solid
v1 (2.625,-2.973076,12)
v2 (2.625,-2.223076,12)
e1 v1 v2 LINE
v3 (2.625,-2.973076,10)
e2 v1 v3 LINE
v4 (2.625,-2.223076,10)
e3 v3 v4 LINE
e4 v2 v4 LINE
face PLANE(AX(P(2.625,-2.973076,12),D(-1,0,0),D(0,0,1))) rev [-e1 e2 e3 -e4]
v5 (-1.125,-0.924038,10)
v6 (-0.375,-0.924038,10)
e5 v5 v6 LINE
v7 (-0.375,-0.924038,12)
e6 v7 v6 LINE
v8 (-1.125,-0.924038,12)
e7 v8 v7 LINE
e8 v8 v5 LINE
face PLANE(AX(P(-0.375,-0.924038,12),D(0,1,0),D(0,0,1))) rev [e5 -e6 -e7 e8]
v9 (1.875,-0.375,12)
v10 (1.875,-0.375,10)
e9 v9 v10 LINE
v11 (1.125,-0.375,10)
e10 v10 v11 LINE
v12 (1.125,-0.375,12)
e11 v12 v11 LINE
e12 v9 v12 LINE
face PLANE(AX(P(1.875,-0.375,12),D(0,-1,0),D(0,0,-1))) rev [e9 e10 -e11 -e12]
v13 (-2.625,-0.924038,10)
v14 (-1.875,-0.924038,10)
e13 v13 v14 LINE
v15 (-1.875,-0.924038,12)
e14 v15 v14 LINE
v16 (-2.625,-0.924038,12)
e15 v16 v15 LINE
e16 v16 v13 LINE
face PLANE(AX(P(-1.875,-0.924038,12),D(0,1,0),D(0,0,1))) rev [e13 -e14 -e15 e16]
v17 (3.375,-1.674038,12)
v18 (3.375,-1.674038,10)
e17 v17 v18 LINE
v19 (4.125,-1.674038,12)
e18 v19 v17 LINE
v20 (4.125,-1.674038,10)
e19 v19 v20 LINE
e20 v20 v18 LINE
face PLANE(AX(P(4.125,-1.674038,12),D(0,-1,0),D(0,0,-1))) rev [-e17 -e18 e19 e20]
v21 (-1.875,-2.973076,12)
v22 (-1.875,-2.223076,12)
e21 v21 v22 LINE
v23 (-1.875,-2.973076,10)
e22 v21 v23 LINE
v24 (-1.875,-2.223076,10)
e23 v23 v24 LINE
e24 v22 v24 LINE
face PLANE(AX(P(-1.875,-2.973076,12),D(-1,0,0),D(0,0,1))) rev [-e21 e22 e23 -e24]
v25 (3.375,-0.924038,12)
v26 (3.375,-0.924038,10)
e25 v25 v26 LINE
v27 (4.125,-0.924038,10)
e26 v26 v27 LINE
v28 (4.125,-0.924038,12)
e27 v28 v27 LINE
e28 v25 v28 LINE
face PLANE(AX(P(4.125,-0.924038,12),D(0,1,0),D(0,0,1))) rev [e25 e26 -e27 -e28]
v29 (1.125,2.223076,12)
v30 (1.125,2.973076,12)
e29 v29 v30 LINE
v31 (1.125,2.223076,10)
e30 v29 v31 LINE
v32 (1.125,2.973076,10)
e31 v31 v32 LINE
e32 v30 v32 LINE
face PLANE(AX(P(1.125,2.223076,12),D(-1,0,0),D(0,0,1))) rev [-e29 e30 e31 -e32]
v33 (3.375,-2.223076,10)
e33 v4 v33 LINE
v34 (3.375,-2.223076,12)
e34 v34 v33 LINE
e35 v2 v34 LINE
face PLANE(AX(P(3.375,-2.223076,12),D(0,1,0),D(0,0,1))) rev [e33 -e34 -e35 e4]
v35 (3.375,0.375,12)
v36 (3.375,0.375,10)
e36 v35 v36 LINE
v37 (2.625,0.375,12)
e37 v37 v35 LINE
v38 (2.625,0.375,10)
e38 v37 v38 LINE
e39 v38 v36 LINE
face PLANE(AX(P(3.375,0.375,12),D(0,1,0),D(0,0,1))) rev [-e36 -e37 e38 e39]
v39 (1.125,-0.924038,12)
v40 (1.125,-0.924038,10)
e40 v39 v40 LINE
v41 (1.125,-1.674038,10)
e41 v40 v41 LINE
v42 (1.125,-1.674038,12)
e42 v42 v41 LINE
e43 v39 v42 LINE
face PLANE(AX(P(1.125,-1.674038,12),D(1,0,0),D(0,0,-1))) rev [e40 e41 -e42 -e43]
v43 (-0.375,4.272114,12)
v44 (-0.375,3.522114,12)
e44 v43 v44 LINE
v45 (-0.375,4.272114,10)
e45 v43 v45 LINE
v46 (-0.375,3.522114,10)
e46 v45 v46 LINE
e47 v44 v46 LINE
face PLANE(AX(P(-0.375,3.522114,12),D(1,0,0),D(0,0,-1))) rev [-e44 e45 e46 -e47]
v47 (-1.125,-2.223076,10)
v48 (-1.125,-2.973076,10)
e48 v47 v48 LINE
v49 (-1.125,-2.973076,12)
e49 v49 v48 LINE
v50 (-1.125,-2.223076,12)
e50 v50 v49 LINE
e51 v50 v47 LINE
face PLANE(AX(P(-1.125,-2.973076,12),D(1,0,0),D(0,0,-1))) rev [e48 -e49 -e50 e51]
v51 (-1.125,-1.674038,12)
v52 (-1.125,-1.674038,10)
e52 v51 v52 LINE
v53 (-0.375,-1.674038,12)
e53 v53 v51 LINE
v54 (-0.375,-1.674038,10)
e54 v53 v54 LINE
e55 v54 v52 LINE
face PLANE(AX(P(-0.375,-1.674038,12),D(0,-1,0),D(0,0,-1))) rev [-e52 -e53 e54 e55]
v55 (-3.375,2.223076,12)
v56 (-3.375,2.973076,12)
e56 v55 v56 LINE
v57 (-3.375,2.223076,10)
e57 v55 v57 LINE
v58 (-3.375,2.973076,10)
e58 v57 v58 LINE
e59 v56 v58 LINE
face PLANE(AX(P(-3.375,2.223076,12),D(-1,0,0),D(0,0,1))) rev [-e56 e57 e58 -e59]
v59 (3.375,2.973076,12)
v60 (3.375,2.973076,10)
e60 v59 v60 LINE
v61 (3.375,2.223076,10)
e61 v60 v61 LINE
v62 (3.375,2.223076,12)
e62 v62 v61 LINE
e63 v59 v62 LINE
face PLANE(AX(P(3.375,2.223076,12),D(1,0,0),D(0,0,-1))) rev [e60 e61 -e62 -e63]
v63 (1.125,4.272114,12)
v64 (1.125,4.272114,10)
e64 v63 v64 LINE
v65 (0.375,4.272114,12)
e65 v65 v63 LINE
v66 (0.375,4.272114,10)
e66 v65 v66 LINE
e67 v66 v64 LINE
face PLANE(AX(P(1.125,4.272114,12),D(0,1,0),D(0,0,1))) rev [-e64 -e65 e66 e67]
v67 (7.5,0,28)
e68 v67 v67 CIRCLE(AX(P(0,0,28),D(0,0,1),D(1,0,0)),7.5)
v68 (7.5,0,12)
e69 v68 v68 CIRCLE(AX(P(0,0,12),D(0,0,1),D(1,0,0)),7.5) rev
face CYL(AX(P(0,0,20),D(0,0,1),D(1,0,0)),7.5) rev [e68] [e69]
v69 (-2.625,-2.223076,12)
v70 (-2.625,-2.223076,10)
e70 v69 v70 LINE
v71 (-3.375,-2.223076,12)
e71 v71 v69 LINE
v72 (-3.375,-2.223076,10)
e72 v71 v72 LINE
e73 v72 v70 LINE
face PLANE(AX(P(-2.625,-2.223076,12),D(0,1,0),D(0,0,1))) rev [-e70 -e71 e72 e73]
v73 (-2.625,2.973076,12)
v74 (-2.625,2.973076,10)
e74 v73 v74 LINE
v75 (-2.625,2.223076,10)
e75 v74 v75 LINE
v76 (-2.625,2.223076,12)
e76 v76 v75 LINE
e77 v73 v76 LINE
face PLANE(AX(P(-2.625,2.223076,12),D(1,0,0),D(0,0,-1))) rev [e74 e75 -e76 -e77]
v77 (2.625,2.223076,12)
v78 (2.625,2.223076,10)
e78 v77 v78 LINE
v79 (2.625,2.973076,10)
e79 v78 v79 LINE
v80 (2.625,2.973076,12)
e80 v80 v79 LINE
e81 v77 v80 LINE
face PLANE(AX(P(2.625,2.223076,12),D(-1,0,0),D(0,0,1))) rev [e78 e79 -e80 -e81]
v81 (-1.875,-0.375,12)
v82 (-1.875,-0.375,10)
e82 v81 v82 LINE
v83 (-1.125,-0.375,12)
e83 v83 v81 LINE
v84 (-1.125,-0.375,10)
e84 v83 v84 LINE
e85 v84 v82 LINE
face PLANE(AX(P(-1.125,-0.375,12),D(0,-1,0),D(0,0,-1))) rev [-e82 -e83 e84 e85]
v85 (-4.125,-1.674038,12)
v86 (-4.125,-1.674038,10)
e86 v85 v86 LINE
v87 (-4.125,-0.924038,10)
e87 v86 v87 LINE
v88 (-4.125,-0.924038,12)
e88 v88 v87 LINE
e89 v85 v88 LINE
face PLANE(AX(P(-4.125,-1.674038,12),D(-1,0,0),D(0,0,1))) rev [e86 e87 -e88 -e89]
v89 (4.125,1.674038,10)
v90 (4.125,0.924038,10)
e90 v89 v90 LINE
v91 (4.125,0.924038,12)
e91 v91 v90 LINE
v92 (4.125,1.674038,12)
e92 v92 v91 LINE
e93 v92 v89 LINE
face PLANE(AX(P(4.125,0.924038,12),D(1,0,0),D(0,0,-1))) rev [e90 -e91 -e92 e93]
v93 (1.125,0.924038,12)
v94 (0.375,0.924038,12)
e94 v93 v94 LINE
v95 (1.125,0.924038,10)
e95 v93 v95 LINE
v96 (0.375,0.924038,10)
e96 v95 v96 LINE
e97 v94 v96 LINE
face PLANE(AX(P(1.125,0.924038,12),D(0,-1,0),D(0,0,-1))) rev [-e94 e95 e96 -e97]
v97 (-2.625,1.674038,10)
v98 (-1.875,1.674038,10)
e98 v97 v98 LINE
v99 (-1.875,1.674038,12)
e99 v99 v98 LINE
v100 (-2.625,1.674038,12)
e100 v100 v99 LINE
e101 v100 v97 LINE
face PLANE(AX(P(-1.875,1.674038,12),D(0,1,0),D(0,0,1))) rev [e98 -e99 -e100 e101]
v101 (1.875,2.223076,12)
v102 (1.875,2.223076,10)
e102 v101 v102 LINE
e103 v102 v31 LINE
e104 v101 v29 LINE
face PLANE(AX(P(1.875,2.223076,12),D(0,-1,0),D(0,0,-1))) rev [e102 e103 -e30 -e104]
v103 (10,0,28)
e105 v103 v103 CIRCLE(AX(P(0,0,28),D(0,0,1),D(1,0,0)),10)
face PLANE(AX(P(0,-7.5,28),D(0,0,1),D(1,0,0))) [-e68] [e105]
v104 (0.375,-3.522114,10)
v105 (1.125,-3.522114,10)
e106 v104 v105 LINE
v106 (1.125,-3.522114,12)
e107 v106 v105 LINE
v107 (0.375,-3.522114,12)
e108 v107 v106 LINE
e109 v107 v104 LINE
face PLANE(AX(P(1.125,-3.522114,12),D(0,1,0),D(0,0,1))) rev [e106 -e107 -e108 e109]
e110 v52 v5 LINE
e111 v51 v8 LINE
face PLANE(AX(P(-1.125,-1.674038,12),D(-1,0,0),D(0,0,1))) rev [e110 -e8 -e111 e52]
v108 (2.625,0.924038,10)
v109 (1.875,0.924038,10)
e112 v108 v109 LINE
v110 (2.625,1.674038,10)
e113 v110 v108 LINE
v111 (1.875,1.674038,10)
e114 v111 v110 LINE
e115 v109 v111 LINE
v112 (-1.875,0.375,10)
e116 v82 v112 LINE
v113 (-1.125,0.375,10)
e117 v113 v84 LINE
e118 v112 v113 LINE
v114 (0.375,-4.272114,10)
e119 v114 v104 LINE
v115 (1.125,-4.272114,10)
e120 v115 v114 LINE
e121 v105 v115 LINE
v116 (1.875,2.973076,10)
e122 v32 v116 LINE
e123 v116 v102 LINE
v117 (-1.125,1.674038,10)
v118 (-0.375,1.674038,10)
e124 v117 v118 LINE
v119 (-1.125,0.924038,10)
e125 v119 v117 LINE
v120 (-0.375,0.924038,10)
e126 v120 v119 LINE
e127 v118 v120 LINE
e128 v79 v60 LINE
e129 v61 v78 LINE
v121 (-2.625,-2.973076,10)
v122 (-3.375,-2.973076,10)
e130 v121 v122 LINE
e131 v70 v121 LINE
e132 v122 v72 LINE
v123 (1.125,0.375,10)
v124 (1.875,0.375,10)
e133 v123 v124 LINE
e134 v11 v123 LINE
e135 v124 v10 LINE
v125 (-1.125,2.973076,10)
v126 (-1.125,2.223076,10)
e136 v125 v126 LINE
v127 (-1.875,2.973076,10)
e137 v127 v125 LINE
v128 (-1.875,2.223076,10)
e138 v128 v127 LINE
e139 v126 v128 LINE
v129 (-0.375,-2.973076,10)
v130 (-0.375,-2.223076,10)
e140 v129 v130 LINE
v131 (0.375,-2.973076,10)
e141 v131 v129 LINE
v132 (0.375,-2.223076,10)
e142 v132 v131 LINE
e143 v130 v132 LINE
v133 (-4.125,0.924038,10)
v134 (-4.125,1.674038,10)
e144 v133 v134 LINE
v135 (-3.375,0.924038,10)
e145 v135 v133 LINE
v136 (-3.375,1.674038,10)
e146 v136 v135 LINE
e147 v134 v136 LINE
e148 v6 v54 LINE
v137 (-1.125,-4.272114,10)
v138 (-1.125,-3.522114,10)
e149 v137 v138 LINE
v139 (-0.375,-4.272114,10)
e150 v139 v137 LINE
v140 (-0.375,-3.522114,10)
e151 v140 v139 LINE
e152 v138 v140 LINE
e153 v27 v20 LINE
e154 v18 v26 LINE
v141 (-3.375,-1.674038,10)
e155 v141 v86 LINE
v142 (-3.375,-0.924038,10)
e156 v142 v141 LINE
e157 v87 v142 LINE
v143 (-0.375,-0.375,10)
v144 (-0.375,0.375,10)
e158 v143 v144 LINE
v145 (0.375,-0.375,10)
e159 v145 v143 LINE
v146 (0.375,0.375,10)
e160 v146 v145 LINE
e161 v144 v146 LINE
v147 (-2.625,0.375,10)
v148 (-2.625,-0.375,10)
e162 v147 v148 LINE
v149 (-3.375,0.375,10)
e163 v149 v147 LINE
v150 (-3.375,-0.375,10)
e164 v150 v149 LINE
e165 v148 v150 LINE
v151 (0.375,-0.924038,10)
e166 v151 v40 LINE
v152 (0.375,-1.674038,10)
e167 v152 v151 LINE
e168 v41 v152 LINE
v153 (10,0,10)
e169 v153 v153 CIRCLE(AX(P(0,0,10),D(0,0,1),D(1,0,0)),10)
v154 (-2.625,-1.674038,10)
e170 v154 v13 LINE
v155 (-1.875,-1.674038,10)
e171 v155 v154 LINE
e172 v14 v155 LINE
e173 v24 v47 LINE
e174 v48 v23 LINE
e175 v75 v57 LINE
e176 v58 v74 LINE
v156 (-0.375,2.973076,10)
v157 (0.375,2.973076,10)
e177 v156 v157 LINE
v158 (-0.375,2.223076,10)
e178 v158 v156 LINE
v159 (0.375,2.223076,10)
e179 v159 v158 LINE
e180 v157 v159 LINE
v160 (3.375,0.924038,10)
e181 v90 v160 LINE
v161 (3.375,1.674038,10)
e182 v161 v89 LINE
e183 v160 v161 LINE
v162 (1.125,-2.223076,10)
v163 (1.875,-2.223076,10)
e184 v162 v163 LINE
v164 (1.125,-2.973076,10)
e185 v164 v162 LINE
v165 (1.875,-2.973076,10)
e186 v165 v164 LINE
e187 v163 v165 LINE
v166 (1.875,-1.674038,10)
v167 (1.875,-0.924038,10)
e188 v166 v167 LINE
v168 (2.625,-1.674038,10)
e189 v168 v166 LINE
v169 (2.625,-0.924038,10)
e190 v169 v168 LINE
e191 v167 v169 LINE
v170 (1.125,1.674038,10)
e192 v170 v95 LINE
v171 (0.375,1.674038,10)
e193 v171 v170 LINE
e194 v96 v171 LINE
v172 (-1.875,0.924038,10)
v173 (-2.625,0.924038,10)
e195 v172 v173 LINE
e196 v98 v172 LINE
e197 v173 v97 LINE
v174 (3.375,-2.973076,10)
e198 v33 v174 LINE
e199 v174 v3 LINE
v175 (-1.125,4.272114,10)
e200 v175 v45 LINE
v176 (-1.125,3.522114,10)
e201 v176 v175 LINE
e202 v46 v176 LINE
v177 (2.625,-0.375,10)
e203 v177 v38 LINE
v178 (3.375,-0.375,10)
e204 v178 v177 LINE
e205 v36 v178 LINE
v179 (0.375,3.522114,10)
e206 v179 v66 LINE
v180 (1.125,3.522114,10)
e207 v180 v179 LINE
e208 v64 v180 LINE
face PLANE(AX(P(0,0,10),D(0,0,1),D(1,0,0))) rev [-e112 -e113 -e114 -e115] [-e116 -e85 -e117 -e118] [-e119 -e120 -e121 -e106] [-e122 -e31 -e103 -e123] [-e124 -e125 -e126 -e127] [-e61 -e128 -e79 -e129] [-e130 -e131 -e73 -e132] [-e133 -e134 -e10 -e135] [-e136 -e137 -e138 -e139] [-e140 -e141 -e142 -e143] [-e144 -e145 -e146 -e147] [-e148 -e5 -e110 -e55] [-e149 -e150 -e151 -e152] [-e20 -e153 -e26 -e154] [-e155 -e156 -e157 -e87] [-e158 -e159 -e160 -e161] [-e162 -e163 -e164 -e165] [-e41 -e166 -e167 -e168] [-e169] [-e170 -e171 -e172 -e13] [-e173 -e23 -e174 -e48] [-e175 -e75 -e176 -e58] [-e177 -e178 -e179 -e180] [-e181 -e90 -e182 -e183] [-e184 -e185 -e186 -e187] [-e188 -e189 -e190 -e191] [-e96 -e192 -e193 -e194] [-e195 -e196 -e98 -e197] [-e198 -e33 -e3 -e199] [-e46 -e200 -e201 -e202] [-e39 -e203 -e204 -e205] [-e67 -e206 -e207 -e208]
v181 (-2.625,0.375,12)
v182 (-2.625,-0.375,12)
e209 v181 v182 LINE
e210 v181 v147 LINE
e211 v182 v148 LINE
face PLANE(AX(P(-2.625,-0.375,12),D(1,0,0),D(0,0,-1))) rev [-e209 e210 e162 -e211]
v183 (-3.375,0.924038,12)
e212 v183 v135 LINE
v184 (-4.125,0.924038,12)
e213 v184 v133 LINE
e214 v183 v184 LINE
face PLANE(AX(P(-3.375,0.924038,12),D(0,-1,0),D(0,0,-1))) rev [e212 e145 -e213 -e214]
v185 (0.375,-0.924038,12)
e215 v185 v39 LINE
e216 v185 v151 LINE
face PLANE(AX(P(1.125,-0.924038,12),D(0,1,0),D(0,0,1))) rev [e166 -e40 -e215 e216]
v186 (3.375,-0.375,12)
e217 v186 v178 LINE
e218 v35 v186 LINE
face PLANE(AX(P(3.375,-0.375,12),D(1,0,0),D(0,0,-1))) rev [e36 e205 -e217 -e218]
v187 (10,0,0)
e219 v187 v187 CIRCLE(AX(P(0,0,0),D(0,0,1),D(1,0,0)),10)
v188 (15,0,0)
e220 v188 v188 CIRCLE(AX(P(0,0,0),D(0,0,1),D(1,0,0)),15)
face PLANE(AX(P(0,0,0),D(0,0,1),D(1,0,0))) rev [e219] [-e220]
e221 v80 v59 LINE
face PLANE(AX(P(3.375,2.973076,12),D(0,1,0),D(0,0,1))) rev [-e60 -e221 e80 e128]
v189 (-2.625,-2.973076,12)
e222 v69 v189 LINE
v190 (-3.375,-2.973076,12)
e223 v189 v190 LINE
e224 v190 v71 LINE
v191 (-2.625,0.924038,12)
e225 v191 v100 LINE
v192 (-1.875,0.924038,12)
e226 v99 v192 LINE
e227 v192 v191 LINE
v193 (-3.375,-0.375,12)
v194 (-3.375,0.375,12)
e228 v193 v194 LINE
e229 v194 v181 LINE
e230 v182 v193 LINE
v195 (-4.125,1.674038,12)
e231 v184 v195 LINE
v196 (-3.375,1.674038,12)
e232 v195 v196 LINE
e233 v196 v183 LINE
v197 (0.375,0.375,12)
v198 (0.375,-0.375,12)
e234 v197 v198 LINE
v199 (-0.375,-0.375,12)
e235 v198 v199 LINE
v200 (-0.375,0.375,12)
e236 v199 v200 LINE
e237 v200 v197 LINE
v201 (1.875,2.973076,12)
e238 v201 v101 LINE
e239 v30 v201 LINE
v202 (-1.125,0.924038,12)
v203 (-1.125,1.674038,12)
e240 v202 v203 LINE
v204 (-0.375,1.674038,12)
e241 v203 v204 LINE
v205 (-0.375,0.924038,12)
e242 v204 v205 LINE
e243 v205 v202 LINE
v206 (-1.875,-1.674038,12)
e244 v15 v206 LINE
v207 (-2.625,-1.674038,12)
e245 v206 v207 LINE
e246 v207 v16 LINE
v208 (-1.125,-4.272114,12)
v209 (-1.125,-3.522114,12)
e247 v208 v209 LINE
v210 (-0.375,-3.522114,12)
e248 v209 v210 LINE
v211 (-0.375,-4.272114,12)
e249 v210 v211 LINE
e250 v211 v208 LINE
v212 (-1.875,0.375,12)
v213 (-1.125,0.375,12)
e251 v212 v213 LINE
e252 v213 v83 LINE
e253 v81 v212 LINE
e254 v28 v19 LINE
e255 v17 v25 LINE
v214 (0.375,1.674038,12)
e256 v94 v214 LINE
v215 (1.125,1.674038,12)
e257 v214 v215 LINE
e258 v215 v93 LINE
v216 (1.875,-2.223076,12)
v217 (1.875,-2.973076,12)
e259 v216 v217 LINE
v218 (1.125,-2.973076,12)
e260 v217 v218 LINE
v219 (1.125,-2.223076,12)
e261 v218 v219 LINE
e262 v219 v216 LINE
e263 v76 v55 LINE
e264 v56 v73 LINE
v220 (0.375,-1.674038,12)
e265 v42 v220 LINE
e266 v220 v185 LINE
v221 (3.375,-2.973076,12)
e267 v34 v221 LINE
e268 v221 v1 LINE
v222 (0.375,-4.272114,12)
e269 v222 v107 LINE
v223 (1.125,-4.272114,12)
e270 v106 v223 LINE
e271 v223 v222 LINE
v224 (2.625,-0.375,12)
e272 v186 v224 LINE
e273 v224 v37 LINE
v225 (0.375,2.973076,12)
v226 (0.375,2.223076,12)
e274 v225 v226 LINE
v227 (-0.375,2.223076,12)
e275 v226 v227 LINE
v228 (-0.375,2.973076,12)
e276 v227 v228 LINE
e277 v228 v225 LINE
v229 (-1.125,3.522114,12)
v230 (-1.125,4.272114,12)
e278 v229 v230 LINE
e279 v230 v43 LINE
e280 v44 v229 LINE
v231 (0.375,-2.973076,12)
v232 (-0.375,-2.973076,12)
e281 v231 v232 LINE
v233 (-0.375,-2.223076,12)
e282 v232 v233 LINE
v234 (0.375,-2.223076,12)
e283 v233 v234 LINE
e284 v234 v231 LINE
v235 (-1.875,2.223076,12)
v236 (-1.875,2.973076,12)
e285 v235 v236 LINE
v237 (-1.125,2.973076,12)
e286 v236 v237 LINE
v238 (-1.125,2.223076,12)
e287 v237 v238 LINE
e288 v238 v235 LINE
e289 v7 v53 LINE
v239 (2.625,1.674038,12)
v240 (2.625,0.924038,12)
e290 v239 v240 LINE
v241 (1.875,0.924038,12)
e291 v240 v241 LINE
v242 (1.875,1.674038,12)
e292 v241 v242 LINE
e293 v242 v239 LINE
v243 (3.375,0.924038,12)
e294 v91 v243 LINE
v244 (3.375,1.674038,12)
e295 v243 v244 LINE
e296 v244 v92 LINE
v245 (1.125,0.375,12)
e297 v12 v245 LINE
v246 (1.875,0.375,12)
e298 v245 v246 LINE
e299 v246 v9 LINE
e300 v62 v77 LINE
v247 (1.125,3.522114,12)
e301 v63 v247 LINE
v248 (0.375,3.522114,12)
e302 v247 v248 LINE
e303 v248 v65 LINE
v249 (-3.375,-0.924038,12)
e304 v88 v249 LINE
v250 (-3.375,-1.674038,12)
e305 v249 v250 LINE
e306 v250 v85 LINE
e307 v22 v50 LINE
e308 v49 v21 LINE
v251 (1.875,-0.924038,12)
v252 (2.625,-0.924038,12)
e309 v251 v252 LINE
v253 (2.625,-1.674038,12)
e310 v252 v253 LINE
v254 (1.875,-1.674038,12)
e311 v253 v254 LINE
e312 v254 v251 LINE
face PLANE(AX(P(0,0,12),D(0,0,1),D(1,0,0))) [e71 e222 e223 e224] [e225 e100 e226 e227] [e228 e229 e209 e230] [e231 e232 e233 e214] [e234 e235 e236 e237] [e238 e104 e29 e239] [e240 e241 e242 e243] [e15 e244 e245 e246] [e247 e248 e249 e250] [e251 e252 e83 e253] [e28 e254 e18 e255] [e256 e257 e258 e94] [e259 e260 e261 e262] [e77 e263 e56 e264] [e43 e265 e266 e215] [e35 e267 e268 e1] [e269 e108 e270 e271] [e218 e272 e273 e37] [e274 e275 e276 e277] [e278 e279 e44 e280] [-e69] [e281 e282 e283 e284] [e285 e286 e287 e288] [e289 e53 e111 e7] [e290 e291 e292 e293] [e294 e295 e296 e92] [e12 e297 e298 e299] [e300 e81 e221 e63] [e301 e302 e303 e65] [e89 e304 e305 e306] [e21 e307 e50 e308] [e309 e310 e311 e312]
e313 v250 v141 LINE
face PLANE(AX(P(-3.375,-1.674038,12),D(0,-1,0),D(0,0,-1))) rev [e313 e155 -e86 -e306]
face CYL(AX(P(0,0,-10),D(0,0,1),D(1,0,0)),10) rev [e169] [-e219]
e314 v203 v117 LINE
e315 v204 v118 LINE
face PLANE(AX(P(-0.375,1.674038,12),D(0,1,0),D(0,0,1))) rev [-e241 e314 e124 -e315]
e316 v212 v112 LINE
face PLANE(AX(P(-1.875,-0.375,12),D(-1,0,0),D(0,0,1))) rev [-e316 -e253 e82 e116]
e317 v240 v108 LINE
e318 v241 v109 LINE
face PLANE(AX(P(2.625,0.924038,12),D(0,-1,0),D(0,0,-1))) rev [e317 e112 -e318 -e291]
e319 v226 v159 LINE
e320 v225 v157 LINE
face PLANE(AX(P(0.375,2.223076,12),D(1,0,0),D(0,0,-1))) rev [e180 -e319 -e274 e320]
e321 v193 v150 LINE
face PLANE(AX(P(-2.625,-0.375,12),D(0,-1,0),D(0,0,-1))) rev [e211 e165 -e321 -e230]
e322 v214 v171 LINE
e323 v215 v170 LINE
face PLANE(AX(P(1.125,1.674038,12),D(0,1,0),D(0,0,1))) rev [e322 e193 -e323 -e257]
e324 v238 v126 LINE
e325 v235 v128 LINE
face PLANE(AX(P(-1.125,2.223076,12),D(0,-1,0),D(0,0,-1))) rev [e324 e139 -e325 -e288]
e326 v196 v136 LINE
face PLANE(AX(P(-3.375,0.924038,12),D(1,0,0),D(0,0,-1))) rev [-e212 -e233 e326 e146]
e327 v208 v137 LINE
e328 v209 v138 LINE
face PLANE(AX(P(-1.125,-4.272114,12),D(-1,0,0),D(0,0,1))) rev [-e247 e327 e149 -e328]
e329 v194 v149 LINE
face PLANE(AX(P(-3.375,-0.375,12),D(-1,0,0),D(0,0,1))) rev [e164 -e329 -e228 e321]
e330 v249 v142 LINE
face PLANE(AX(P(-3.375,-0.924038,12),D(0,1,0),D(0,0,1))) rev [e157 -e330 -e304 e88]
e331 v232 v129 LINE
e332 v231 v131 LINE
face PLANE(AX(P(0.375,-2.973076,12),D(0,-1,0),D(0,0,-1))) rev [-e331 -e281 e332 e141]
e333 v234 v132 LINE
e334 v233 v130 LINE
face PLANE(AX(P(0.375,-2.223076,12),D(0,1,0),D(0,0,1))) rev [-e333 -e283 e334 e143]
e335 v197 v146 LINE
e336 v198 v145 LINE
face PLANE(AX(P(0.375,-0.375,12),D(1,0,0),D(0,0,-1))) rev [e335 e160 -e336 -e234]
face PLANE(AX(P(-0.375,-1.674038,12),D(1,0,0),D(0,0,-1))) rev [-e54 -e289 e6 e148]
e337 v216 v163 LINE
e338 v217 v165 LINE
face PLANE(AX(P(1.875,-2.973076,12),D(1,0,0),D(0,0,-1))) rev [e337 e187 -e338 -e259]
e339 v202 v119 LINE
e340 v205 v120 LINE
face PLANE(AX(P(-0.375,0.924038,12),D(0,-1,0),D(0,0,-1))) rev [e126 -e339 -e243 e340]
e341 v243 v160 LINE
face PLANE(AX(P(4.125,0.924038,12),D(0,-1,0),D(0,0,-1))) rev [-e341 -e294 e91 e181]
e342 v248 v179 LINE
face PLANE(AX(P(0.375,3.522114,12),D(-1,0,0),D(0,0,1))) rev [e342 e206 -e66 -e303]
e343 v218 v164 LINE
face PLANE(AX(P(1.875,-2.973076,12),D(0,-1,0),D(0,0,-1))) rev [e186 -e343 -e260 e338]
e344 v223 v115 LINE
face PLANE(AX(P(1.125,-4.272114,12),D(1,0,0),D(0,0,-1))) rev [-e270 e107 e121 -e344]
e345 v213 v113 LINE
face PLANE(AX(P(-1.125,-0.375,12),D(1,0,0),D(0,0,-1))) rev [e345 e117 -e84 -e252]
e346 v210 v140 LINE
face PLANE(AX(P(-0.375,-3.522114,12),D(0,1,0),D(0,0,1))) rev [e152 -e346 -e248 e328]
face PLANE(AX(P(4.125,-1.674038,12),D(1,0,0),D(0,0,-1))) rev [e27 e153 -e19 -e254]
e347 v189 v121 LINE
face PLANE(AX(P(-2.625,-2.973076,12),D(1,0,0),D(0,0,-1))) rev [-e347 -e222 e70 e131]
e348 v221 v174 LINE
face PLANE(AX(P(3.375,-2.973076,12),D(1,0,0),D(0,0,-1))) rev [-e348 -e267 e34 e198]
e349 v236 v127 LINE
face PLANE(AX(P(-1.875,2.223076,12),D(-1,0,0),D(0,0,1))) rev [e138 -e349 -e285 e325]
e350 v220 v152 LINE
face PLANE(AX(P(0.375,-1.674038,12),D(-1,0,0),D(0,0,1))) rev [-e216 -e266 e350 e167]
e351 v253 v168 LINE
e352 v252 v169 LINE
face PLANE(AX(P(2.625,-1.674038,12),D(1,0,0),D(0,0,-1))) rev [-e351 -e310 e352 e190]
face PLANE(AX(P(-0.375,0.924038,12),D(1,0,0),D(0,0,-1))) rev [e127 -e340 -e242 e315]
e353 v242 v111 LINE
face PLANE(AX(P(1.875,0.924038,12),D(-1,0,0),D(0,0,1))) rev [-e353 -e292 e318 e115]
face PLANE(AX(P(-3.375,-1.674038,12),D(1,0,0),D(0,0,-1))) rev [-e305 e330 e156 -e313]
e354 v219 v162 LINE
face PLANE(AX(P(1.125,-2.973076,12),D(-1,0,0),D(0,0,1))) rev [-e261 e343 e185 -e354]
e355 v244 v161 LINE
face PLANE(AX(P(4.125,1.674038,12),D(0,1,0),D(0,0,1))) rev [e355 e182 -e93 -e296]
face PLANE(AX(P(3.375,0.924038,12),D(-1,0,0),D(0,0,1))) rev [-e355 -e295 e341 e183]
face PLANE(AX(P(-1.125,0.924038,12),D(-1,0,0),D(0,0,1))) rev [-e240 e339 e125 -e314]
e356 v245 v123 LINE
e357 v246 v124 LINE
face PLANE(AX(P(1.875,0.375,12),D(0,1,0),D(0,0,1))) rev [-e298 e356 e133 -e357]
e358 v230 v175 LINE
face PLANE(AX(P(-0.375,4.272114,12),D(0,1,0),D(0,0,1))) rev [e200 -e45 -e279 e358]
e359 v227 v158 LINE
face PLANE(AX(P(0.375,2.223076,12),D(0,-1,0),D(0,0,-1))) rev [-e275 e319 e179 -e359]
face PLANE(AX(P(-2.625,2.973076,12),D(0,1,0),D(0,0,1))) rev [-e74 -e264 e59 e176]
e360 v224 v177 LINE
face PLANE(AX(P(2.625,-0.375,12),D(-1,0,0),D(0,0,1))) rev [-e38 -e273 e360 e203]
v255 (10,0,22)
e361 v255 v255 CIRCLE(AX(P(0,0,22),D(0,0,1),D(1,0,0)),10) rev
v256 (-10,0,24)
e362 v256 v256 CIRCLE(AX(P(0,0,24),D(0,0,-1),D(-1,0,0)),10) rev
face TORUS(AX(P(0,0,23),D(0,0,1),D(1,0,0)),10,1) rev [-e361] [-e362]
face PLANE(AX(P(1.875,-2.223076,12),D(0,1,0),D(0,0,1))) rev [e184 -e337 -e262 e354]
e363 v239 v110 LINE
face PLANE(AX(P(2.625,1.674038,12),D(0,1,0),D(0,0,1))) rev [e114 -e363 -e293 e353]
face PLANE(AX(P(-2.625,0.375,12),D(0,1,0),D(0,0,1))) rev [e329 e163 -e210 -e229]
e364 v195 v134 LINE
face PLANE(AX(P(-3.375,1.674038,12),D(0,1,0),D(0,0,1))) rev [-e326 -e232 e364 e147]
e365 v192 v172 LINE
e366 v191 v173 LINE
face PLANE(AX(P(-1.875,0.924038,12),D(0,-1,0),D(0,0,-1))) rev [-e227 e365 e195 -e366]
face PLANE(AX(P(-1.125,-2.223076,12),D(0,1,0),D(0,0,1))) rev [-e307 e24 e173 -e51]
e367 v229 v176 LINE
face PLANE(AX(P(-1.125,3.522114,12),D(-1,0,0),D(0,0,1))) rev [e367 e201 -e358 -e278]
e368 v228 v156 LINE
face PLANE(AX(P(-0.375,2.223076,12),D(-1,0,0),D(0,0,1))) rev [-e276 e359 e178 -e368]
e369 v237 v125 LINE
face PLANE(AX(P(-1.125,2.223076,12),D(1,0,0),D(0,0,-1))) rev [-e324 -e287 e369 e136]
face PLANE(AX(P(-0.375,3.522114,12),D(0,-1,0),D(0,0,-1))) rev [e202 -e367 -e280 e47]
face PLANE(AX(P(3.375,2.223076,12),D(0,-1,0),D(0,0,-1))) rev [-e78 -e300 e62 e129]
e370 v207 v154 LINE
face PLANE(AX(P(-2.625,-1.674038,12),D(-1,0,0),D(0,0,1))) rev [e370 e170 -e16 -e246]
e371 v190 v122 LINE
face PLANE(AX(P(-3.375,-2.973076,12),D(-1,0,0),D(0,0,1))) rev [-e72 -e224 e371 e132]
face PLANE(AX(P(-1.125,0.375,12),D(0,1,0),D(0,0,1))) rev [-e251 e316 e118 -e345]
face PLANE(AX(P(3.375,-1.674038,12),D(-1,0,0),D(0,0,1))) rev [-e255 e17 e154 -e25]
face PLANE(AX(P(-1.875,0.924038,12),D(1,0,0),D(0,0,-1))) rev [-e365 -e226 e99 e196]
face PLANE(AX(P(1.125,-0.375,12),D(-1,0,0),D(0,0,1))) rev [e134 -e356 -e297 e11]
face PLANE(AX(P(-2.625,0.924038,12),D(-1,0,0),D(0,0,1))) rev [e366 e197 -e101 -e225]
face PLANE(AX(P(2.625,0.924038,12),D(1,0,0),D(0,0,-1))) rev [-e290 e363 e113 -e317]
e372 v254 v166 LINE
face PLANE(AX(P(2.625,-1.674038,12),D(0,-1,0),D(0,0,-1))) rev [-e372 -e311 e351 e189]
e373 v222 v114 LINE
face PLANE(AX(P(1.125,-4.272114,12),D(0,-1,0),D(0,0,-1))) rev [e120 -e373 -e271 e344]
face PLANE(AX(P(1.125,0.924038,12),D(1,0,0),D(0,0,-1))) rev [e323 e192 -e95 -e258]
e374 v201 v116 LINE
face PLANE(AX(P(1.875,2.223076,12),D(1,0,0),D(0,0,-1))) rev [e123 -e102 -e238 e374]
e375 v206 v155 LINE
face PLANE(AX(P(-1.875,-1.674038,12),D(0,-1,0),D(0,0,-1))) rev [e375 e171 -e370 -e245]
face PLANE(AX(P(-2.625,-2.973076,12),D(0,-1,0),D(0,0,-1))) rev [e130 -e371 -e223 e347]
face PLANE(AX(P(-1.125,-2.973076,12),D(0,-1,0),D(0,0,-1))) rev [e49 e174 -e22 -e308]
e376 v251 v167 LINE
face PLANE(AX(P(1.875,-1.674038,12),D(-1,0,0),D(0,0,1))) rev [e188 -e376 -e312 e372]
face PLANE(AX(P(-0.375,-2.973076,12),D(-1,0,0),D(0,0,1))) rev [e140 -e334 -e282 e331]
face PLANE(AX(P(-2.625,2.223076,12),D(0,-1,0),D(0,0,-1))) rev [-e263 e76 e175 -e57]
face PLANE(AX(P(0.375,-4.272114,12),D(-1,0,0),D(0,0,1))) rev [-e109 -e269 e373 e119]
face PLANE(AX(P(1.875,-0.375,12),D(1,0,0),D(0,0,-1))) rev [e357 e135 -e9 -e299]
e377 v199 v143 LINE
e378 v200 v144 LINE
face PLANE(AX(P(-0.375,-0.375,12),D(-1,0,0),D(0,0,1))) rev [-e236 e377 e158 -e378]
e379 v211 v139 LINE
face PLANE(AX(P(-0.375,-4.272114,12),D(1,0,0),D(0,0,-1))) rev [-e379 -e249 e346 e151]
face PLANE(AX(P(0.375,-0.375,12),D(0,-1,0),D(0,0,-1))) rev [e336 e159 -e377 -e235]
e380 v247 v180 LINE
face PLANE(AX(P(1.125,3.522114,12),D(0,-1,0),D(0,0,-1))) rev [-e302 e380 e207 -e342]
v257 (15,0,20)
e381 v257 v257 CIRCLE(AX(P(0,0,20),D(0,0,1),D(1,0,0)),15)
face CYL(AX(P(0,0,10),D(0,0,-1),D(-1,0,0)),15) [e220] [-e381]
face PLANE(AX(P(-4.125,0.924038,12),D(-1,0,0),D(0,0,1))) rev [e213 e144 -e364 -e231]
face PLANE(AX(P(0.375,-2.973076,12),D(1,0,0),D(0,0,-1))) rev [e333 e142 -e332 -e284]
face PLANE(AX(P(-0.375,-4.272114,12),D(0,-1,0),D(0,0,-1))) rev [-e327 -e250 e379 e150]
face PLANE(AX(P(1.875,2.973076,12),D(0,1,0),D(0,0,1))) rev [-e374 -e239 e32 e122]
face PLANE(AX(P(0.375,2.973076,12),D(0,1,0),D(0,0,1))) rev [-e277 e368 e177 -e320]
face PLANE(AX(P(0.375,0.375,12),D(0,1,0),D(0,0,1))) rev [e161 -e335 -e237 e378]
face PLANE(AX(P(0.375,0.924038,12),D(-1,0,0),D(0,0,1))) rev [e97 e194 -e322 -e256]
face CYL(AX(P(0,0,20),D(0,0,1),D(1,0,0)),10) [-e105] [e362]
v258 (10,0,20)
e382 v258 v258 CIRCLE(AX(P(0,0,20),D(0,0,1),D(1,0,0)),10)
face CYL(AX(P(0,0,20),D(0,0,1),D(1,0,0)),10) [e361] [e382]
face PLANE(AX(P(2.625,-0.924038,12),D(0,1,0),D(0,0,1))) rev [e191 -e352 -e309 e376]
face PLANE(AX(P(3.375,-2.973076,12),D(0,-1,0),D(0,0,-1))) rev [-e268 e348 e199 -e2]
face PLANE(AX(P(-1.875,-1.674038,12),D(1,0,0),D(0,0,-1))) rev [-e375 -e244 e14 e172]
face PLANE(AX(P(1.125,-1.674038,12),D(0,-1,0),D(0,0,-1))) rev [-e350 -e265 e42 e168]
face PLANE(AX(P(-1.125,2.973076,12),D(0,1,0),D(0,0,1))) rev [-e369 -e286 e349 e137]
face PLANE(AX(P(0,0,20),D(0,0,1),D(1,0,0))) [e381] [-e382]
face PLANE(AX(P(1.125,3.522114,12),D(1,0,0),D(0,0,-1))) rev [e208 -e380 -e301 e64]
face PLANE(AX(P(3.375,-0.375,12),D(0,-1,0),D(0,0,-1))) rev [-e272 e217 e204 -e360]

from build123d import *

# Parameters (mm, degrees)
SKETCH1_R                  = 15
BOSS_EXTRUDE1_DEPTH        = 10
SKETCH2_R                  = 10
CUT_EXTRUDE1_DEPTH         = 20
SKETCH3_R                  = 15
BOSS_EXTRUDE2_DEPTH        = 10
SKETCH5_R                  = 10
CUT_EXTRUDE3_DEPTH         = 8
SKETCH8_W                  = 0.75
SKETCH8_H                  = 0.75
CUT_EXTRUDE5_DEPTH         = 2
FILL_START                 = -1.125
FILL_PATTERN2_OUTLINE_W    = 0.75
FILL_PATTERN2_OUTLINE_H    = 2
FILL_PATTERN2_DEPTH        = 0.75
FILL_START_2               = 0.375
FILL_PATTERN2_2_OUTLINE_W  = 0.75
FILL_PATTERN2_2_OUTLINE_H  = 2
FILL_PATTERN2_2_DEPTH      = 0.75
FILL_START_3               = -3.375
FILL_PATTERN2_3_OUTLINE_W  = 0.75
FILL_PATTERN2_3_OUTLINE_H  = 2
FILL_PATTERN2_3_DEPTH      = 0.75
FILL_START_4               = -1.875
FILL_PATTERN2_4_OUTLINE_W  = 0.75
FILL_PATTERN2_4_OUTLINE_H  = 2
FILL_PATTERN2_4_DEPTH      = 0.75
FILL_START_5               = 1.125
FILL_PATTERN2_5_OUTLINE_W  = 0.75
FILL_PATTERN2_5_OUTLINE_H  = 2
FILL_PATTERN2_5_DEPTH      = 0.75
FILL_START_6               = 2.625
FILL_PATTERN2_6_OUTLINE_W  = 0.75
FILL_PATTERN2_6_OUTLINE_H  = 2
FILL_PATTERN2_6_DEPTH      = 0.75
FILL_START_7               = -4.125
FILL_PATTERN2_7_OUTLINE_W  = 0.75
FILL_PATTERN2_7_OUTLINE_H  = 2
FILL_PATTERN2_7_DEPTH      = 0.75
FILL_START_8               = -2.625
FILL_PATTERN2_8_OUTLINE_W  = 0.75
FILL_PATTERN2_8_OUTLINE_H  = 2
FILL_PATTERN2_8_DEPTH      = 0.75
FILL_START_9               = -0.375
FILL_PATTERN2_9_OUTLINE_W  = 0.75
FILL_PATTERN2_9_OUTLINE_H  = 2
FILL_PATTERN2_9_DEPTH      = 0.75
FILL_START_10              = 1.875
FILL_PATTERN2_10_OUTLINE_W = 0.75
FILL_PATTERN2_10_OUTLINE_H = 2
FILL_PATTERN2_10_DEPTH     = 0.75
FILL_START_11              = 3.375
FILL_PATTERN2_11_OUTLINE_W = 0.75
FILL_PATTERN2_11_OUTLINE_H = 2
FILL_PATTERN2_11_DEPTH     = 0.75
SKETCH15_W                 = 16
SKETCH15_H                 = 2.5
SKETCH16_R                 = 1


# Read off the part's stored shape, not the designer's step: Fill Pattern2
with BuildPart() as part:
    # Sketch1 → Boss-Extrude1 (new body)
    with BuildSketch(Plane.XY):
        Circle(SKETCH1_R)
    extrude(amount=BOSS_EXTRUDE1_DEPTH)

    # Sketch2 → Cut-Extrude1 (cut)
    with BuildSketch(Plane.XY.offset(10)):
        Circle(SKETCH2_R)
    extrude(amount=-CUT_EXTRUDE1_DEPTH, mode=Mode.SUBTRACT)

    # Sketch3 → Boss-Extrude2 (add)
    with BuildSketch(Plane.XY.offset(10)):
        Circle(SKETCH3_R)
    extrude(amount=BOSS_EXTRUDE2_DEPTH)

    # Sketch5 → Cut-Extrude3 (cut)
    with BuildSketch(Plane.XY.offset(20)):
        Circle(SKETCH5_R)
    extrude(amount=-CUT_EXTRUDE3_DEPTH, mode=Mode.SUBTRACT)

    # Sketch8 → Cut-Extrude5 (cut)
    with BuildSketch(Plane(origin=(0, 0, 10), x_dir=(-1, 0, 0), z_dir=(0, 0, -1))):
        Rectangle(SKETCH8_W, SKETCH8_H)
    extrude(amount=-CUT_EXTRUDE5_DEPTH, mode=Mode.SUBTRACT)

    # Fill Pattern2 outline → Fill Pattern2 (cut)
    with BuildSketch(Plane.YZ.offset(FILL_START)):
        with Locations((-1.299038106, 11)):
            Rectangle(FILL_PATTERN2_OUTLINE_W, FILL_PATTERN2_OUTLINE_H)
        with Locations((1.299038106, 11)):
            Rectangle(FILL_PATTERN2_OUTLINE_W, FILL_PATTERN2_OUTLINE_H)
        with Locations((-3.897114317, 11)):
            Rectangle(FILL_PATTERN2_OUTLINE_W, FILL_PATTERN2_OUTLINE_H)
        with Locations((3.897114317, 11)):
            Rectangle(FILL_PATTERN2_OUTLINE_W, FILL_PATTERN2_OUTLINE_H)
    extrude(amount=FILL_PATTERN2_DEPTH, mode=Mode.SUBTRACT)

    # Fill Pattern2 2 outline → Fill Pattern2 2 (cut)
    with BuildSketch(Plane.YZ.offset(FILL_START_2)):
        with Locations((-1.299038106, 11)):
            Rectangle(FILL_PATTERN2_2_OUTLINE_W, FILL_PATTERN2_2_OUTLINE_H)
        with Locations((1.299038106, 11)):
            Rectangle(FILL_PATTERN2_2_OUTLINE_W, FILL_PATTERN2_2_OUTLINE_H)
        with Locations((-3.897114317, 11)):
            Rectangle(FILL_PATTERN2_2_OUTLINE_W, FILL_PATTERN2_2_OUTLINE_H)
        with Locations((3.897114317, 11)):
            Rectangle(FILL_PATTERN2_2_OUTLINE_W, FILL_PATTERN2_2_OUTLINE_H)
    extrude(amount=FILL_PATTERN2_2_DEPTH, mode=Mode.SUBTRACT)

    # Fill Pattern2 3 outline → Fill Pattern2 3 (cut)
    with BuildSketch(Plane.YZ.offset(FILL_START_3)):
        with Locations((0, 11)):
            Rectangle(FILL_PATTERN2_3_OUTLINE_W, FILL_PATTERN2_3_OUTLINE_H)
        with Locations((-2.598076211, 11)):
            Rectangle(FILL_PATTERN2_3_OUTLINE_W, FILL_PATTERN2_3_OUTLINE_H)
        with Locations((2.598076211, 11)):
            Rectangle(FILL_PATTERN2_3_OUTLINE_W, FILL_PATTERN2_3_OUTLINE_H)
    extrude(amount=FILL_PATTERN2_3_DEPTH, mode=Mode.SUBTRACT)

    # Fill Pattern2 4 outline → Fill Pattern2 4 (cut)
    with BuildSketch(Plane.YZ.offset(FILL_START_4)):
        with Locations((0, 11)):
            Rectangle(FILL_PATTERN2_4_OUTLINE_W, FILL_PATTERN2_4_OUTLINE_H)
        with Locations((-2.598076211, 11)):
            Rectangle(FILL_PATTERN2_4_OUTLINE_W, FILL_PATTERN2_4_OUTLINE_H)
        with Locations((2.598076211, 11)):
            Rectangle(FILL_PATTERN2_4_OUTLINE_W, FILL_PATTERN2_4_OUTLINE_H)
    extrude(amount=FILL_PATTERN2_4_DEPTH, mode=Mode.SUBTRACT)

    # Fill Pattern2 5 outline → Fill Pattern2 5 (cut)
    with BuildSketch(Plane.YZ.offset(FILL_START_5)):
        with Locations((0, 11)):
            Rectangle(FILL_PATTERN2_5_OUTLINE_W, FILL_PATTERN2_5_OUTLINE_H)
        with Locations((-2.598076211, 11)):
            Rectangle(FILL_PATTERN2_5_OUTLINE_W, FILL_PATTERN2_5_OUTLINE_H)
        with Locations((2.598076211, 11)):
            Rectangle(FILL_PATTERN2_5_OUTLINE_W, FILL_PATTERN2_5_OUTLINE_H)
    extrude(amount=FILL_PATTERN2_5_DEPTH, mode=Mode.SUBTRACT)

    # Fill Pattern2 6 outline → Fill Pattern2 6 (cut)
    with BuildSketch(Plane.YZ.offset(FILL_START_6)):
        with Locations((0, 11)):
            Rectangle(FILL_PATTERN2_6_OUTLINE_W, FILL_PATTERN2_6_OUTLINE_H)
        with Locations((-2.598076211, 11)):
            Rectangle(FILL_PATTERN2_6_OUTLINE_W, FILL_PATTERN2_6_OUTLINE_H)
        with Locations((2.598076211, 11)):
            Rectangle(FILL_PATTERN2_6_OUTLINE_W, FILL_PATTERN2_6_OUTLINE_H)
    extrude(amount=FILL_PATTERN2_6_DEPTH, mode=Mode.SUBTRACT)

    # Fill Pattern2 7 outline → Fill Pattern2 7 (cut)
    with BuildSketch(Plane.YZ.offset(FILL_START_7)):
        with Locations((-1.299038106, 11)):
            Rectangle(FILL_PATTERN2_7_OUTLINE_W, FILL_PATTERN2_7_OUTLINE_H)
        with Locations((1.299038106, 11)):
            Rectangle(FILL_PATTERN2_7_OUTLINE_W, FILL_PATTERN2_7_OUTLINE_H)
    extrude(amount=FILL_PATTERN2_7_DEPTH, mode=Mode.SUBTRACT)

    # Fill Pattern2 8 outline → Fill Pattern2 8 (cut)
    with BuildSketch(Plane.YZ.offset(FILL_START_8)):
        with Locations((-1.299038106, 11)):
            Rectangle(FILL_PATTERN2_8_OUTLINE_W, FILL_PATTERN2_8_OUTLINE_H)
        with Locations((1.299038106, 11)):
            Rectangle(FILL_PATTERN2_8_OUTLINE_W, FILL_PATTERN2_8_OUTLINE_H)
    extrude(amount=FILL_PATTERN2_8_DEPTH, mode=Mode.SUBTRACT)

    # Fill Pattern2 9 outline → Fill Pattern2 9 (cut)
    with BuildSketch(Plane.YZ.offset(FILL_START_9)):
        with Locations((-2.598076211, 11)):
            Rectangle(FILL_PATTERN2_9_OUTLINE_W, FILL_PATTERN2_9_OUTLINE_H)
        with Locations((2.598076211, 11)):
            Rectangle(FILL_PATTERN2_9_OUTLINE_W, FILL_PATTERN2_9_OUTLINE_H)
    extrude(amount=FILL_PATTERN2_9_DEPTH, mode=Mode.SUBTRACT)

    # Fill Pattern2 10 outline → Fill Pattern2 10 (cut)
    with BuildSketch(Plane.YZ.offset(FILL_START_10)):
        with Locations((-1.299038106, 11)):
            Rectangle(FILL_PATTERN2_10_OUTLINE_W, FILL_PATTERN2_10_OUTLINE_H)
        with Locations((1.299038106, 11)):
            Rectangle(FILL_PATTERN2_10_OUTLINE_W, FILL_PATTERN2_10_OUTLINE_H)
    extrude(amount=FILL_PATTERN2_10_DEPTH, mode=Mode.SUBTRACT)

    # Fill Pattern2 11 outline → Fill Pattern2 11 (cut)
    with BuildSketch(Plane.YZ.offset(FILL_START_11)):
        with Locations((-1.299038106, 11)):
            Rectangle(FILL_PATTERN2_11_OUTLINE_W, FILL_PATTERN2_11_OUTLINE_H)
        with Locations((1.299038106, 11)):
            Rectangle(FILL_PATTERN2_11_OUTLINE_W, FILL_PATTERN2_11_OUTLINE_H)
    extrude(amount=FILL_PATTERN2_11_DEPTH, mode=Mode.SUBTRACT)

    # Sketch15 → Revolve2 (revolve)
    with BuildSketch(Plane(origin=(0, 0, 0), x_dir=(0, 0, -1), z_dir=(1, 0, 0)), mode=Mode.PRIVATE) as revolve2_sk:
        with Locations((-20, -8.75)):
            Rectangle(SKETCH15_W, SKETCH15_H)
    revolve(revolve2_sk.sketch.rotate(Axis((0, 0, 20), (0, 0, -1)), 270), axis=Axis((0, 0, 20), (0, 0, -1)))

    # Sketch16 → Cut-Revolve2 (revolve, cut)
    with BuildSketch(Plane(origin=(0, 0, 0), x_dir=(0, 0, -1), z_dir=(1, 0, 0)), mode=Mode.PRIVATE) as cut_revolve2_sk:
        with Locations((-23, 10)):
            Circle(SKETCH16_R)
    revolve(cut_revolve2_sk.sketch.rotate(Axis((0, 0, 20), (0, 0, -1)), 90), axis=Axis((0, 0, 20), (0, 0, -1)), mode=Mode.SUBTRACT)


solid = part.part
